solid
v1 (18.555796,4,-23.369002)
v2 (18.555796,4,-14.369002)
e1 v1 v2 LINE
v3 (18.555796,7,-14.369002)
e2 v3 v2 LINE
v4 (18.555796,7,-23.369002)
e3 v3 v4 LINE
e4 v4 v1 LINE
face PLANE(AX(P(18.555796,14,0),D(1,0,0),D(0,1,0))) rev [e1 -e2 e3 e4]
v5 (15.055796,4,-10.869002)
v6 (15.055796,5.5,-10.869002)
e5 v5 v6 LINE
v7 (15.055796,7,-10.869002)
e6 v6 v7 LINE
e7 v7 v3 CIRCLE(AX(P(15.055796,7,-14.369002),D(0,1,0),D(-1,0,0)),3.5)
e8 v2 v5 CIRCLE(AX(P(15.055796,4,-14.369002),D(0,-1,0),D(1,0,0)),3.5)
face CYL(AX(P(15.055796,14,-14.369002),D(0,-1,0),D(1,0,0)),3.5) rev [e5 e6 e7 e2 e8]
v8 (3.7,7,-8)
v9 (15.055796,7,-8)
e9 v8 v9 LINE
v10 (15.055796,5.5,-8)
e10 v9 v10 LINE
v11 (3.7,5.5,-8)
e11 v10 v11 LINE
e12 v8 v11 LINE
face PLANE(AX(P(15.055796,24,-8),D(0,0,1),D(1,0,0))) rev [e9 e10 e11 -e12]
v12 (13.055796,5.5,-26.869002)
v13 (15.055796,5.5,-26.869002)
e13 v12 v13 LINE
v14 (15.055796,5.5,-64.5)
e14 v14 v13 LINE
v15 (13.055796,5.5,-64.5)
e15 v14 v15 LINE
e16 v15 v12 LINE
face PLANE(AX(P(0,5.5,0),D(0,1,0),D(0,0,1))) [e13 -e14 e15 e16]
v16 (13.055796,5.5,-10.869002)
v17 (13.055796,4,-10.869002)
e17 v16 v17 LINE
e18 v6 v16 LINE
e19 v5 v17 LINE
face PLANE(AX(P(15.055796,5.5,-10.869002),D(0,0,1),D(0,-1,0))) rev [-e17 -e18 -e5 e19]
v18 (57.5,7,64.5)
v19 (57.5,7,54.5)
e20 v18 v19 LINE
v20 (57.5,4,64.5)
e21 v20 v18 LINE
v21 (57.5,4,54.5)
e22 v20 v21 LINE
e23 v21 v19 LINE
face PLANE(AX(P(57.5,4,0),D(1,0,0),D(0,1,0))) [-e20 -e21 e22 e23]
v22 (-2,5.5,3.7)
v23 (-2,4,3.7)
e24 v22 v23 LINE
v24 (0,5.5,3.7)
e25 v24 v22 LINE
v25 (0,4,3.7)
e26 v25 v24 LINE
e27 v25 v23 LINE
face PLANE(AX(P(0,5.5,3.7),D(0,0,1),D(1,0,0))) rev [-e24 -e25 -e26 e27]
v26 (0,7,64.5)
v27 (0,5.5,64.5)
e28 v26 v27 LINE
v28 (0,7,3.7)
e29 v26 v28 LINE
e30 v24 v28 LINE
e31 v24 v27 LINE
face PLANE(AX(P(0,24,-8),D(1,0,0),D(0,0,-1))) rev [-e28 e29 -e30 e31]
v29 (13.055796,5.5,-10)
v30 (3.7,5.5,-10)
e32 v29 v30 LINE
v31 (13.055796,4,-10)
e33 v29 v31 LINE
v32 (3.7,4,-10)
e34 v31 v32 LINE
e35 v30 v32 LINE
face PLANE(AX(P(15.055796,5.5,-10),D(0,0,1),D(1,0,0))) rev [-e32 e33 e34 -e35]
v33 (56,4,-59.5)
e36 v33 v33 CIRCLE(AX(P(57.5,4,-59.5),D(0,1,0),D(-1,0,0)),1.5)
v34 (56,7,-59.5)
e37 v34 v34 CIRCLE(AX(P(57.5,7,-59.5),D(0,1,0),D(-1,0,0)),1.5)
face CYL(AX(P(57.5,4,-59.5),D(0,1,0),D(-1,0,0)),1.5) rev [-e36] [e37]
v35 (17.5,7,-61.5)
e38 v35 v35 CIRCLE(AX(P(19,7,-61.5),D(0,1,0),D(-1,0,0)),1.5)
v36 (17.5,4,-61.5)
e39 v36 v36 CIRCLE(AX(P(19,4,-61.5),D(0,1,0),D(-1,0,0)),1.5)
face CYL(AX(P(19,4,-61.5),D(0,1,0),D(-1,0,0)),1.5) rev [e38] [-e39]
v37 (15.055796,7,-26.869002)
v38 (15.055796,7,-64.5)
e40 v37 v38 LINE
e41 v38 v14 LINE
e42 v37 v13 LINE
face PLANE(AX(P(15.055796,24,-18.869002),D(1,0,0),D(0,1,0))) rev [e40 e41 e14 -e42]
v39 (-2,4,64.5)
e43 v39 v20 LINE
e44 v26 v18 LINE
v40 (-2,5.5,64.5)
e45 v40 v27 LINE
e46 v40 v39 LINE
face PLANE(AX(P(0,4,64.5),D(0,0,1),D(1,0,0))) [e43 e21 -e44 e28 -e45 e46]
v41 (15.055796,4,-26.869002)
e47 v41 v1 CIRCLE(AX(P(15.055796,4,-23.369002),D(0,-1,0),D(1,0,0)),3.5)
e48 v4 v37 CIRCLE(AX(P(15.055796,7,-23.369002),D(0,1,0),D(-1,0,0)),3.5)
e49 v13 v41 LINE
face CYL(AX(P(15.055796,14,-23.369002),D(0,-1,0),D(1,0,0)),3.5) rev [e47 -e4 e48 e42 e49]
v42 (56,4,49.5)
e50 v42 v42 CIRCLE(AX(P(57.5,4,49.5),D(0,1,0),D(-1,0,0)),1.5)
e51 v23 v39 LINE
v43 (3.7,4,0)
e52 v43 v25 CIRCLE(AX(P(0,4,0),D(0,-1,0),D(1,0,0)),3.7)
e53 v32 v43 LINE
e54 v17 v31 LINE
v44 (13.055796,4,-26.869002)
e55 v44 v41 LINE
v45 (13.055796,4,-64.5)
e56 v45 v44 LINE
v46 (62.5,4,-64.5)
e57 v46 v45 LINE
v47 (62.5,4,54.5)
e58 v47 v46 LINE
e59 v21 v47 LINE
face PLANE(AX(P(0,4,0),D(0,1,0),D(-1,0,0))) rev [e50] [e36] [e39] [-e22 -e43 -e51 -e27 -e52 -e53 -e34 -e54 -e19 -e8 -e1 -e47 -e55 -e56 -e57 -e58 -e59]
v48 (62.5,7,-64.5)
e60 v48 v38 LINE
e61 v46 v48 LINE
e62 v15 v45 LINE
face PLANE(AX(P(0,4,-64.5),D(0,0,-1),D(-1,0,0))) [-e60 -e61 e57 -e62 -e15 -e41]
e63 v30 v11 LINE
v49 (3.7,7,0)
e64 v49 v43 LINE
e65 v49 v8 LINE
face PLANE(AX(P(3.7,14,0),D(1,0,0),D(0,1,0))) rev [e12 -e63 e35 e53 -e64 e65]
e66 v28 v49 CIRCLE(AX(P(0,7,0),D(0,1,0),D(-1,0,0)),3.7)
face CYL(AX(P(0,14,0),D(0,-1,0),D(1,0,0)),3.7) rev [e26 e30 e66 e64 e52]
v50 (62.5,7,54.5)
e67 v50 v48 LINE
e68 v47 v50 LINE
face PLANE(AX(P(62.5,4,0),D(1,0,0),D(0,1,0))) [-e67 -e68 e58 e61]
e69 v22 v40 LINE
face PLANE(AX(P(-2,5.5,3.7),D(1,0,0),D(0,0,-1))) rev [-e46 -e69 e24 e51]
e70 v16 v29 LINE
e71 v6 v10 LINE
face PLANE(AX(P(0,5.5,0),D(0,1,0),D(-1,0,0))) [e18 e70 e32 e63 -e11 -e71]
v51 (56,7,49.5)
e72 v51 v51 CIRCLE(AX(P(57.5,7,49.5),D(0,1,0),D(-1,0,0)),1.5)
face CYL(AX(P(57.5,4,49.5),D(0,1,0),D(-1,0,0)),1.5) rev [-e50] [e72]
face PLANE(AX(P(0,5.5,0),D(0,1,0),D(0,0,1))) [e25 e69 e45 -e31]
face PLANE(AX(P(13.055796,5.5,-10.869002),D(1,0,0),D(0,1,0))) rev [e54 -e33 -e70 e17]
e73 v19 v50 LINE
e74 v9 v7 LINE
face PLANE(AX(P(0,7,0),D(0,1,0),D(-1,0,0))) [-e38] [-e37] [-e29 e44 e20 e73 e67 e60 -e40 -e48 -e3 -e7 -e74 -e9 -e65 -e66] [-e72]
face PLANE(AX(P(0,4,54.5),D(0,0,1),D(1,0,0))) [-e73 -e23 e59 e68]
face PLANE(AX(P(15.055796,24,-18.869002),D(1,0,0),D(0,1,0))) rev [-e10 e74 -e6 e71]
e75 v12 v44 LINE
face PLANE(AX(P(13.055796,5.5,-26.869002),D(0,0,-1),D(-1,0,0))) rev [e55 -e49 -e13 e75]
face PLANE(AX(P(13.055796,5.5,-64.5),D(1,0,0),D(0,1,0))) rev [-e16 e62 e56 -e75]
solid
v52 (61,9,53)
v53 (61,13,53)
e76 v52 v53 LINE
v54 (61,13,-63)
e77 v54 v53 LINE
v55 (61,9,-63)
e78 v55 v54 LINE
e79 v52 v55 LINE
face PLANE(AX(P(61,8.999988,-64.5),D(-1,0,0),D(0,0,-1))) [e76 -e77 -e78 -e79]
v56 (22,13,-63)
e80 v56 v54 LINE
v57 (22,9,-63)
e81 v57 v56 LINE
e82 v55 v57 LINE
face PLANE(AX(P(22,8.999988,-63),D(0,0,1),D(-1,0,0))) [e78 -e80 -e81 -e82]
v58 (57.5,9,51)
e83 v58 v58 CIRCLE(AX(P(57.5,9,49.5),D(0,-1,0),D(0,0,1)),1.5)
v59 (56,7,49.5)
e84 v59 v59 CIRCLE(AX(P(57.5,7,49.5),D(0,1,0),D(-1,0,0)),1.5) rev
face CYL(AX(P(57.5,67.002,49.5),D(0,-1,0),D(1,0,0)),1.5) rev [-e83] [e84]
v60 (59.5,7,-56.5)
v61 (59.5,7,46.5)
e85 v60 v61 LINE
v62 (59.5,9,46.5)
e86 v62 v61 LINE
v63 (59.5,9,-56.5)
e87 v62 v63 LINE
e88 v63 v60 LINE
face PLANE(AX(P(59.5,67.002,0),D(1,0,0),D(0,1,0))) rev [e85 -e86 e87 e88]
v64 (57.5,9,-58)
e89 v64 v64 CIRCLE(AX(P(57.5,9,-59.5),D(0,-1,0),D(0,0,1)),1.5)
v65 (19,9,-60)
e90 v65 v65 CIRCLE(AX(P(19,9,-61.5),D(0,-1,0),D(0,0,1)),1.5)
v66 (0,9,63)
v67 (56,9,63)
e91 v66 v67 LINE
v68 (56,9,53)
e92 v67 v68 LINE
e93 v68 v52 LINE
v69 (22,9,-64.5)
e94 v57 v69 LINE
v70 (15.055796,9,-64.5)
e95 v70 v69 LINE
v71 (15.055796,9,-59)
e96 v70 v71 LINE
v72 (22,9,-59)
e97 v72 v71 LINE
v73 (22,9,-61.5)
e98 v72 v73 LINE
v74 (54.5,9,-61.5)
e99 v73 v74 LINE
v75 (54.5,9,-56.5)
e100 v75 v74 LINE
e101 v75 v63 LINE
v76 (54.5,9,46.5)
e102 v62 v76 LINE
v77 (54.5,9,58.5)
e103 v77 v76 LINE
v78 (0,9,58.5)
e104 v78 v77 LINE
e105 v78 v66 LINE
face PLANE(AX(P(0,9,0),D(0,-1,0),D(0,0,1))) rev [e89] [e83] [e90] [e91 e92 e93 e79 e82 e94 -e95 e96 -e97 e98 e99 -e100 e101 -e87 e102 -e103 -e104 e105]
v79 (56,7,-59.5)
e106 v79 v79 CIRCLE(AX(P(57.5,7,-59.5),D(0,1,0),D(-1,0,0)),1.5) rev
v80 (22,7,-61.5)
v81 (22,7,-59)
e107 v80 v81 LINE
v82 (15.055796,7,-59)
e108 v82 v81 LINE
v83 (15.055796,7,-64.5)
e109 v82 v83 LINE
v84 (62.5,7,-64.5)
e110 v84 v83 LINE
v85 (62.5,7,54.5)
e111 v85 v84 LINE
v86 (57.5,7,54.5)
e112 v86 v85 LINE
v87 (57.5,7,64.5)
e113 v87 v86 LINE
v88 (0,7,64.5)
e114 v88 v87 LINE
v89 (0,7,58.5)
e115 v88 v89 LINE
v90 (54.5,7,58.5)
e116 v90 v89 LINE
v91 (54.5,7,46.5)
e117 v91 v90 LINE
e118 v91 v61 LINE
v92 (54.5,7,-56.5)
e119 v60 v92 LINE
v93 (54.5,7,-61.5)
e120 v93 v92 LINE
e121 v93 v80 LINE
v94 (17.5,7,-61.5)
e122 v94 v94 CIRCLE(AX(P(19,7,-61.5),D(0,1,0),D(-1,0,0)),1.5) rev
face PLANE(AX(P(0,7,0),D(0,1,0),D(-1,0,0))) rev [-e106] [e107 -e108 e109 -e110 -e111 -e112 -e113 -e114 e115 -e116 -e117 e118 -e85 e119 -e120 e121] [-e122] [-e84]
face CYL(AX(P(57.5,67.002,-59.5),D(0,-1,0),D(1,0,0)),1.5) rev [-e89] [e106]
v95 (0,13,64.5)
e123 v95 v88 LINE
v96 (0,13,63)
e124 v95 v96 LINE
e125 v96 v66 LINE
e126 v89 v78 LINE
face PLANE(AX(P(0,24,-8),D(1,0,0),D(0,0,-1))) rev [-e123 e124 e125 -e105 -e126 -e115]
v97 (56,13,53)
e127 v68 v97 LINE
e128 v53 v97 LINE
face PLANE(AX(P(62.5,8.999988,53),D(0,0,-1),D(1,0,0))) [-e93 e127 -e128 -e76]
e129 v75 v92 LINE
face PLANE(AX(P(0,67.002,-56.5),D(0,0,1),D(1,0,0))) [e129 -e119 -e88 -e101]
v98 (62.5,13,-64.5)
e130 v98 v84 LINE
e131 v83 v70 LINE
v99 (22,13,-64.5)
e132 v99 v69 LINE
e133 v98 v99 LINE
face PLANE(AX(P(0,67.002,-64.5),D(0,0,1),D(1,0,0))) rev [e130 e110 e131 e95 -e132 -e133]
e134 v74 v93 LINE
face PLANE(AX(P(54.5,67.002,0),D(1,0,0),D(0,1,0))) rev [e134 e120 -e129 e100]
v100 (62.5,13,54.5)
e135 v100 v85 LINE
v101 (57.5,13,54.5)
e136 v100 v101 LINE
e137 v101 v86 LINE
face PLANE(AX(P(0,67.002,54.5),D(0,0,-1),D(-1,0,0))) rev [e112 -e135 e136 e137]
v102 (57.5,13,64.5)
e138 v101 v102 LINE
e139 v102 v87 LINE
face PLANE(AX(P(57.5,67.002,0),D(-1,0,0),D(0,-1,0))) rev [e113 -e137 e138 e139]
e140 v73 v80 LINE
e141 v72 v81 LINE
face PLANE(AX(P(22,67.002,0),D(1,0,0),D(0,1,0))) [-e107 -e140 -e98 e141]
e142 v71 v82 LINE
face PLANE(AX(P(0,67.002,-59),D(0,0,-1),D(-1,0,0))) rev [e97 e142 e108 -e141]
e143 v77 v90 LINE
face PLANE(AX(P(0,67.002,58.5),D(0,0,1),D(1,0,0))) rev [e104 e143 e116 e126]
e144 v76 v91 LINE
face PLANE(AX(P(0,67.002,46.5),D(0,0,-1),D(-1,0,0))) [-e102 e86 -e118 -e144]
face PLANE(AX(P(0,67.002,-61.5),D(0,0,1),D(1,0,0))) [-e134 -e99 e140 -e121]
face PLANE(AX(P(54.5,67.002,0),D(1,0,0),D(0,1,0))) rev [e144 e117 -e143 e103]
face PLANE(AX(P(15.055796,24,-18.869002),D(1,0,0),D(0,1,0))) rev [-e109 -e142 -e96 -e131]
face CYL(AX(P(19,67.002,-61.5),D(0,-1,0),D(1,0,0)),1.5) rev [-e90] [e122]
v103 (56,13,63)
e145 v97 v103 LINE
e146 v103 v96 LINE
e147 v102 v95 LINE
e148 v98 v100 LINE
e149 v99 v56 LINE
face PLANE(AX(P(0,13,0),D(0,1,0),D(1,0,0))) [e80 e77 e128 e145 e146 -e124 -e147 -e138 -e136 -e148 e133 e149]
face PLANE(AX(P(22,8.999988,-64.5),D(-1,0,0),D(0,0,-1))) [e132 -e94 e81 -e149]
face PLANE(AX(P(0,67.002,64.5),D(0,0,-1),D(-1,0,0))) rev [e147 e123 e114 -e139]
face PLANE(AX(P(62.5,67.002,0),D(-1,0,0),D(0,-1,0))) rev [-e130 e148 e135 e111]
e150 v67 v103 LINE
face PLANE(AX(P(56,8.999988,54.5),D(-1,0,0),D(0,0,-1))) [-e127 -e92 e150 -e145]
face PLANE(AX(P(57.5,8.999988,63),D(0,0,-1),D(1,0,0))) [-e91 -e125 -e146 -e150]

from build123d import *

# Parameters (mm, degrees)
SKETCH2_R                 = 1.5
BOSS_EXTRUDE1_DEPTH       = 3
BOSS_EXTRUDE2_DEPTH       = 6
BOSS_EXTRUDE2_2_OUTLINE_R = 1.5
BOSS_EXTRUDE2_2_DEPTH     = 2
CUT_EXTRUDE1_DEPTH        = 10
CUT_EXTRUDE2_DEPTH        = 20
SKETCH6_W                 = 2
SKETCH6_H                 = 37.630998281
SKETCH6_H_2               = 60.8
EXTRUDE_THIN1_DEPTH       = 1.5


# Read off the part's stored shape, not the designer's step: Boss-Extrude2
with BuildPart() as part:
    # Sketch2 → Boss-Extrude1 (new body)
    with BuildSketch(Plane(origin=(0, 7, 0), x_dir=(1, 0, 0), z_dir=(0, 1, 0))):
        Polygon((-57.5, -54.5), (-57.5, -64.5), (57.5, -64.5), (57.5, -54.5), (62.5, -54.5), (62.5, 64.5), (-62.5, 64.5), (-62.5, -54.5), align=None)
        with BuildLine():
            ThreePointArc((-57.185427384, -50.966643811), (-57.444119701, -50.998958769), (-57.7045, -50.985994532))
            ThreePointArc((-57.7045, -50.985994532), (-59, -49.5), (-57.7045, -48.014005468))
            ThreePointArc((-57.7045, -48.014005468), (-57.444119701, -48.001041231), (-57.185427384, -48.033356189))
            ThreePointArc((-57.185427384, -48.033356189), (-56, -49.5), (-57.185427384, -50.966643811))
        make_face(mode=Mode.SUBTRACT)
        with Locations(Location((57.5, -49.5, 0), (0, 0, 180))):
            Circle(SKETCH2_R, mode=Mode.SUBTRACT)
        with Locations(Location((-57.5, 59.5, 0), (0, 0, 180))):
            Circle(SKETCH2_R, mode=Mode.SUBTRACT)
        with Locations(Location((-19, 61.5, 0), (0, 0, 180))):
            Circle(SKETCH2_R, mode=Mode.SUBTRACT)
        with Locations(Location((19, 61.5, 0), (0, 0, 180))):
            Circle(SKETCH2_R, mode=Mode.SUBTRACT)
        with Locations(Location((57.5, 59.5, 0), (0, 0, 180))):
            Circle(SKETCH2_R, mode=Mode.SUBTRACT)
    extrude(amount=-BOSS_EXTRUDE1_DEPTH)

    # Sketch4 → Cut-Extrude1 (cut)
    with BuildSketch(Plane.XZ.offset(-4)):
        with BuildLine():
            Line((-3.7, -8), (-3.7, 0))
            ThreePointArc((-3.7, 0), (0, 3.7), (3.7, 0))
            Line((3.7, 0), (3.7, -8))
            ThreePointArc((3.7, -8), (0, -11.7), (-3.7, -8))
        make_face()
        with BuildLine():
            Line((11.55579566, -23.369001719), (11.55579566, -14.369001719))
            ThreePointArc((11.55579566, -14.369001719), (15.05579566, -10.869001719), (18.55579566, -14.369001719))
            Line((18.55579566, -14.369001719), (18.55579566, -23.369001719))
            ThreePointArc((18.55579566, -23.369001719), (15.05579566, -26.869001719), (11.55579566, -23.369001719))
        make_face()
    extrude(amount=-CUT_EXTRUDE1_DEPTH, mode=Mode.SUBTRACT)


with BuildPart() as body_2:
    # Boss-Extrude2 outline → Boss-Extrude2 (new body)
    with BuildSketch(Plane(origin=(0, 7, 0), x_dir=(1, 0, 0), z_dir=(0, 1, 0))):
        Polygon((-61, 63), (-22, 63), (-22, 64.5), (-62.5, 64.5), (-62.5, -54.5), (-57.5, -54.5), (-57.5, -64.5), (57.5, -64.5), (57.5, -54.5), (62.5, -54.5), (62.5, 64.5), (22, 64.5), (22, 63), (61, 63), (61, -53), (56, -53), (56, -63), (-56, -63), (-56, -53), (-61, -53), align=None)
    extrude(amount=BOSS_EXTRUDE2_DEPTH)

    # Boss-Extrude2 2 outline → Boss-Extrude2 2 (add)
    with BuildSketch(Plane(origin=(0, 7, 0), x_dir=(1, 0, 0), z_dir=(0, 1, 0))):
        Polygon((-22, 64.5), (-22, 63), (-61, 63), (-61, -53), (-56, -53), (-56, -63), (56, -63), (56, -53), (61, -53), (61, 63), (22, 63), (22, 64.5), align=None)
        with Locations((-57.5, -49.5)):
            Circle(BOSS_EXTRUDE2_2_OUTLINE_R, mode=Mode.SUBTRACT)
        with Locations((57.5, -49.5)):
            Circle(BOSS_EXTRUDE2_2_OUTLINE_R, mode=Mode.SUBTRACT)
        with Locations((-57.5, 59.5)):
            Circle(BOSS_EXTRUDE2_2_OUTLINE_R, mode=Mode.SUBTRACT)
        with Locations((-19, 61.5)):
            Circle(BOSS_EXTRUDE2_2_OUTLINE_R, mode=Mode.SUBTRACT)
        Polygon((-22, 61.5), (-22, 59), (22, 59), (22, 61.5), (54.5, 61.5), (54.5, 56.5), (59.5, 56.5), (59.5, -46.5), (54.5, -46.5), (54.5, -58.5), (-54.5, -58.5), (-54.5, -46.5), (-59.5, -46.5), (-59.5, 56.5), (-54.5, 56.5), (-54.5, 61.5), align=None, mode=Mode.SUBTRACT)
        with Locations((19, 61.5)):
            Circle(BOSS_EXTRUDE2_2_OUTLINE_R, mode=Mode.SUBTRACT)
        with Locations((57.5, 59.5)):
            Circle(BOSS_EXTRUDE2_2_OUTLINE_R, mode=Mode.SUBTRACT)
    extrude(amount=BOSS_EXTRUDE2_2_DEPTH)


with BuildPart() as cut_extrude2_tool:
    # Sketch5 → Cut-Extrude2 (new body)
    with BuildSketch(Plane.XZ.offset(-4)):
        Polygon((15.05579566, -18.869001719), (15.05579566, -64.5), (-62.5, -64.5), (-62.5, 54.5), (-57.5, 54.5), (-57.5, 64.5), (0, 64.5), (0, -8), (15.05579566, -8), align=None)
    extrude(amount=-CUT_EXTRUDE2_DEPTH)


with BuildPart() as part_1:
    add(part.part)

    # Cut-Extrude2: cut by cut_extrude2_tool
    add(cut_extrude2_tool.part, mode=Mode.SUBTRACT)

    # Sketch6 → Extrude-Thin1 (add)
    with BuildSketch(Plane.XZ.offset(-4)):
        with Locations((14.05579566, -45.68450086)):
            Rectangle(SKETCH6_W, SKETCH6_H)
        Polygon((15.05579566, -10.869001719), (15.05579566, -8), (3.7, -8), (3.7, -10), (13.05579566, -10), (13.05579566, -10.869001719), align=None)
        with Locations((-1, 34.1)):
            Rectangle(SKETCH6_W, SKETCH6_H_2)
    extrude(amount=-EXTRUDE_THIN1_DEPTH)


with BuildPart() as body_2_1:
    add(body_2.part)

    # Cut-Extrude2: cut by cut_extrude2_tool
    add(cut_extrude2_tool.part, mode=Mode.SUBTRACT)


solid = Compound([part_1.part, body_2_1.part])
